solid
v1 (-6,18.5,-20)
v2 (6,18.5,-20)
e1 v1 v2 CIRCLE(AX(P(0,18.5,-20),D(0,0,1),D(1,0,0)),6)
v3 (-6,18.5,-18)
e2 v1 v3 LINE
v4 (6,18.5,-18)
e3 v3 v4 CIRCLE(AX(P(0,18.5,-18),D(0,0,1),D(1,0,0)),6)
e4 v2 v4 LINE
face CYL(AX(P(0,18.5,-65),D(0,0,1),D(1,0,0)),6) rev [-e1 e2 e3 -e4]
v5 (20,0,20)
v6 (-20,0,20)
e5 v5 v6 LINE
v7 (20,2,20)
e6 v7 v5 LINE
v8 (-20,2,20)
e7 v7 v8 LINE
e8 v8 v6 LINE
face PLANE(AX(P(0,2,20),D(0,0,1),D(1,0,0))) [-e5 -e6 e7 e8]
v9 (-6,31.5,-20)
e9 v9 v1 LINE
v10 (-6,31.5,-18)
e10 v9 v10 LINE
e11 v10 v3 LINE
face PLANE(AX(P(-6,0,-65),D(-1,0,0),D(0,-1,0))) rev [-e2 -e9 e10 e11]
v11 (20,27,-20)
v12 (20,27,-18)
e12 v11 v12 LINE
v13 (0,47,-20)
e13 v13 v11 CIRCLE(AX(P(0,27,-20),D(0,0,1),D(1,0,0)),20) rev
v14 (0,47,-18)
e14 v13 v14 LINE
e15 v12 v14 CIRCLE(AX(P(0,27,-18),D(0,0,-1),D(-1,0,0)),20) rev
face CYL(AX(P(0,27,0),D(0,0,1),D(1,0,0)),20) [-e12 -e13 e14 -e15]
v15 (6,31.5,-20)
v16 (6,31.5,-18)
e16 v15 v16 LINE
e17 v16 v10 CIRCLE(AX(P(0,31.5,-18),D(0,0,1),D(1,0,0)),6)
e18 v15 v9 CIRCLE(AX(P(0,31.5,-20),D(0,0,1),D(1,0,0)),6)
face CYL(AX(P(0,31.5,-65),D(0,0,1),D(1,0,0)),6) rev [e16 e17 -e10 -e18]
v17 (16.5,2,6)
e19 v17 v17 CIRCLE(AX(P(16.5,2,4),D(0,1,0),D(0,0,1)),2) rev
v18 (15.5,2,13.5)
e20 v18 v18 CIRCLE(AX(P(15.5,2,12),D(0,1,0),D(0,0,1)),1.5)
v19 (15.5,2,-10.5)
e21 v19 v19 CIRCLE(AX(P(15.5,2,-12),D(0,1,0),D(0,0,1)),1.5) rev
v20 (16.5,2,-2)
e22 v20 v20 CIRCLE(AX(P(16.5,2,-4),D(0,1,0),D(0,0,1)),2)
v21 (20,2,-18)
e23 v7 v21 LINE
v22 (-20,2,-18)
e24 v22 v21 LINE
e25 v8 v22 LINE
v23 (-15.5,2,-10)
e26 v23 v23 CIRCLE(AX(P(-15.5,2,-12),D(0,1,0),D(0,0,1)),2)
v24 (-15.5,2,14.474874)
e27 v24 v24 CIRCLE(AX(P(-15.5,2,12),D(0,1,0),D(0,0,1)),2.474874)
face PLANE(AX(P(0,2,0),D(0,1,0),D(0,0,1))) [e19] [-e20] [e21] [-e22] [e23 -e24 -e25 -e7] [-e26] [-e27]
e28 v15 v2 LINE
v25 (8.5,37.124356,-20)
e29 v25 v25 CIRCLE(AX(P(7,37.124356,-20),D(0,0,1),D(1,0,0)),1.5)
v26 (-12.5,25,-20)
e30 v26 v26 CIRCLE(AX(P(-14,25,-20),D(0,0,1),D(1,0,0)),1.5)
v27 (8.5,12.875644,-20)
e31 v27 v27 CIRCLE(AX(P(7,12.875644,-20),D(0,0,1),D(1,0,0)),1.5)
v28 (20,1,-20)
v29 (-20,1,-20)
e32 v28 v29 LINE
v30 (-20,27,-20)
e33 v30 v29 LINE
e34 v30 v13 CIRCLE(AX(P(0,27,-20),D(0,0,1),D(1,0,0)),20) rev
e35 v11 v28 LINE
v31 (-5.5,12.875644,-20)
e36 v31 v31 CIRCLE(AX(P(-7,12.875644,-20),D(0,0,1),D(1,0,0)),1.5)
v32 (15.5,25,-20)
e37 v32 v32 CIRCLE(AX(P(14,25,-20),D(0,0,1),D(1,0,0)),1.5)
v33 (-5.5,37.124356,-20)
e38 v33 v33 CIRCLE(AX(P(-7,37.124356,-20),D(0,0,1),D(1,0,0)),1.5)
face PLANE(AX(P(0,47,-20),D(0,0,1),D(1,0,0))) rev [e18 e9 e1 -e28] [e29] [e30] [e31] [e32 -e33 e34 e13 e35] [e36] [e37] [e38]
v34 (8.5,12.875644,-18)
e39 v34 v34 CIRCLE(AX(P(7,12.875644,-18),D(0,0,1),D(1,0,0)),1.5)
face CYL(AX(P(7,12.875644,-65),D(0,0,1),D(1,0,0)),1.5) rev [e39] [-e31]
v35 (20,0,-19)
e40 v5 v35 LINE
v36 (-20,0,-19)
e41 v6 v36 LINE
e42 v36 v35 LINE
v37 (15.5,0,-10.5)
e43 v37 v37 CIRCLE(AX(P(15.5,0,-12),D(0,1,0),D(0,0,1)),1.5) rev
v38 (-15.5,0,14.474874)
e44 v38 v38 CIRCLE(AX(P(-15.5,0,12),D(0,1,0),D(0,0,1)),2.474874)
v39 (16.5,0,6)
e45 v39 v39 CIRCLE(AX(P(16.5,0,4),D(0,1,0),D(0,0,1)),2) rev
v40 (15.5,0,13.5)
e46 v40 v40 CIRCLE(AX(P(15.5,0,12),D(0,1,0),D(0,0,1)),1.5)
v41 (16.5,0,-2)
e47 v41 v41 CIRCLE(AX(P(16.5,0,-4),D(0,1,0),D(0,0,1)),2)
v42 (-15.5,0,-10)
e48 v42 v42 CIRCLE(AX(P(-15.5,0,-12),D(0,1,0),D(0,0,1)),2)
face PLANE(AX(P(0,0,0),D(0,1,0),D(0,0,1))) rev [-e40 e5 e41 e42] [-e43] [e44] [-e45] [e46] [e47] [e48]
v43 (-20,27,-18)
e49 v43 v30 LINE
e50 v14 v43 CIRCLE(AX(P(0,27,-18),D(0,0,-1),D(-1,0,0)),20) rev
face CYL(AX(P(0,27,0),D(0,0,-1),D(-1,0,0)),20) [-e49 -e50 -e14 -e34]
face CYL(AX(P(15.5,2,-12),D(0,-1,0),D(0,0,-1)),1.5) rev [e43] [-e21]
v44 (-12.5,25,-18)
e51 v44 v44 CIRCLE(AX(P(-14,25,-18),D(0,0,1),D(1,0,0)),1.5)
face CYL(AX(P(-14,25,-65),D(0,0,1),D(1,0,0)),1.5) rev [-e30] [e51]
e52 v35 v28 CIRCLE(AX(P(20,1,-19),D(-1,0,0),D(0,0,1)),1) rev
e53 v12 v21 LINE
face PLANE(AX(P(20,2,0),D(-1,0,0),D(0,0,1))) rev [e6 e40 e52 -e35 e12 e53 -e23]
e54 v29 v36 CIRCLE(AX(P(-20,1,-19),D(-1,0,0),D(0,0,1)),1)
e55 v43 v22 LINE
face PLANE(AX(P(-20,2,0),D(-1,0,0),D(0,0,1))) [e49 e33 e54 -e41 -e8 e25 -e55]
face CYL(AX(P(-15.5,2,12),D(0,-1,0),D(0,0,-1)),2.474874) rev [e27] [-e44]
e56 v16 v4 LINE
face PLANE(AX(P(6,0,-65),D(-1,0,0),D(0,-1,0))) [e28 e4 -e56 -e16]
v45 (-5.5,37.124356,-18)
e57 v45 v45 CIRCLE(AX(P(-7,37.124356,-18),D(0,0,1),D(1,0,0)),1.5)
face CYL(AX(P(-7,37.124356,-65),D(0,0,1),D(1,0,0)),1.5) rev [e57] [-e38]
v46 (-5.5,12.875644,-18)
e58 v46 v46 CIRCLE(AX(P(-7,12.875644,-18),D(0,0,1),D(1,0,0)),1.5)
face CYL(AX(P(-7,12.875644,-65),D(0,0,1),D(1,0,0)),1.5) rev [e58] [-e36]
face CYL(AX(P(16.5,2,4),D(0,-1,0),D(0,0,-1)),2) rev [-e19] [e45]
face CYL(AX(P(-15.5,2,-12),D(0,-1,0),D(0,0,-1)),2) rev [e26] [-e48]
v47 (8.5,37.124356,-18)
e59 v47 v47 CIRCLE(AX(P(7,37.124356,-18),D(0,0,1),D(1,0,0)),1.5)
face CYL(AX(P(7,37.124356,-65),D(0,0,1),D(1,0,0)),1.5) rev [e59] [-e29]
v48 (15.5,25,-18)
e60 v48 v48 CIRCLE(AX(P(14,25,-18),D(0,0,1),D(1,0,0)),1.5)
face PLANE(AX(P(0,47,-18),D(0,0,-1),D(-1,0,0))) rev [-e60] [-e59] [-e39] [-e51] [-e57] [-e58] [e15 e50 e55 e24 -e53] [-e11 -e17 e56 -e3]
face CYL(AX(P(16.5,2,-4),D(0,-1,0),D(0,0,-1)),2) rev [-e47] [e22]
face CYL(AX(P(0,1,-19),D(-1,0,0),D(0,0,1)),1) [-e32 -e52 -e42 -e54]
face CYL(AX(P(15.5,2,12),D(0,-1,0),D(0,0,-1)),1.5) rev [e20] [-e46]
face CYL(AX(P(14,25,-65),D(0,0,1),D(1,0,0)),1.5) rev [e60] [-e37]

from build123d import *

# Parameters (mm, degrees)
SKETCH1_W           = 40
SKETCH1_H           = 38
SKETCH1_R           = 2.474873734
SKETCH1_R_2         = 1.5
SKETCH1_R_3         = 2
BOSS_EXTRUDE3_DEPTH = 2
SKETCH1_5_W         = 40
SKETCH1_5_H         = 2
BOSS_EXTRUDE4_DEPTH = 47
FILLET1_R           = 20
FILLET2_R           = 1
SKETCH2_R           = 1.5
CUT_EXTRUDE2_DEPTH  = 47


with BuildPart() as part:
    # Sketch1 → Boss-Extrude3 (new body)
    with BuildSketch(Plane(origin=(0, 0, 0), x_dir=(1, 0, 0), z_dir=(0, 1, 0))):
        with Locations((0, -1)):
            Rectangle(SKETCH1_W, SKETCH1_H)
        with Locations(Location((-15.5, -12, 0), (0, 0, 270))):
            Circle(SKETCH1_R, mode=Mode.SUBTRACT)
        with Locations(Location((15.5, -12, 0), (0, 0, 270))):
            Circle(SKETCH1_R_2, mode=Mode.SUBTRACT)
        with Locations(Location((16.5, -4, 0), (0, 0, 270))):
            Circle(SKETCH1_R_3, mode=Mode.SUBTRACT)
        with Locations(Location((-15.5, 12, 0), (0, 0, 270))):
            Circle(SKETCH1_R_3, mode=Mode.SUBTRACT)
        with Locations(Location((16.5, 4, 0), (0, 0, 270))):
            Circle(SKETCH1_R_3, mode=Mode.SUBTRACT)
        with Locations(Location((15.5, 12, 0), (0, 0, 270))):
            Circle(SKETCH1_R_2, mode=Mode.SUBTRACT)
    extrude(amount=BOSS_EXTRUDE3_DEPTH)

    # Sketch1<5> → Boss-Extrude4 (add)
    with BuildSketch(Plane(origin=(0, 0, 0), x_dir=(1, 0, 0), z_dir=(0, 1, 0))):
        with Locations((0, 19)):
            Rectangle(SKETCH1_5_W, SKETCH1_5_H)
    extrude(amount=BOSS_EXTRUDE4_DEPTH)

    # Fillet1
    fillet1_edges = [part.edges().sort_by_distance(p)[0] for p in [
        (20, 47, -19),
        (-20, 47, -19),
    ]]
    fillet(fillet1_edges, radius=FILLET1_R - 0.0001)  # a hair under: the kernel refuses the full size

    # Fillet2
    fillet2_edges = [part.edges().sort_by_distance(p)[0] for p in [
        (0, 0, -20),
    ]]
    fillet(fillet2_edges, radius=FILLET2_R)

    # Sketch2 → Cut-Extrude2 (cut)
    with BuildSketch(Plane.XY.offset(-18)):
        with Locations((-14, 25)):
            Circle(SKETCH2_R)
        with Locations((-7, 37.124355653)):
            Circle(SKETCH2_R)
        with Locations((7, 37.124355653)):
            Circle(SKETCH2_R)
        with Locations((14, 25)):
            Circle(SKETCH2_R)
        with Locations((7, 12.875644347)):
            Circle(SKETCH2_R)
        with Locations((-7, 12.875644347)):
            Circle(SKETCH2_R)
        with BuildLine():
            Line((6, 31.5), (6, 18.5))
            ThreePointArc((6, 18.5), (0, 12.5), (-6, 18.5))
            Line((-6, 18.5), (-6, 31.5))
            ThreePointArc((-6, 31.5), (0, 37.5), (6, 31.5))
        make_face()
    extrude(amount=-CUT_EXTRUDE2_DEPTH, mode=Mode.SUBTRACT)


solid = part.part
